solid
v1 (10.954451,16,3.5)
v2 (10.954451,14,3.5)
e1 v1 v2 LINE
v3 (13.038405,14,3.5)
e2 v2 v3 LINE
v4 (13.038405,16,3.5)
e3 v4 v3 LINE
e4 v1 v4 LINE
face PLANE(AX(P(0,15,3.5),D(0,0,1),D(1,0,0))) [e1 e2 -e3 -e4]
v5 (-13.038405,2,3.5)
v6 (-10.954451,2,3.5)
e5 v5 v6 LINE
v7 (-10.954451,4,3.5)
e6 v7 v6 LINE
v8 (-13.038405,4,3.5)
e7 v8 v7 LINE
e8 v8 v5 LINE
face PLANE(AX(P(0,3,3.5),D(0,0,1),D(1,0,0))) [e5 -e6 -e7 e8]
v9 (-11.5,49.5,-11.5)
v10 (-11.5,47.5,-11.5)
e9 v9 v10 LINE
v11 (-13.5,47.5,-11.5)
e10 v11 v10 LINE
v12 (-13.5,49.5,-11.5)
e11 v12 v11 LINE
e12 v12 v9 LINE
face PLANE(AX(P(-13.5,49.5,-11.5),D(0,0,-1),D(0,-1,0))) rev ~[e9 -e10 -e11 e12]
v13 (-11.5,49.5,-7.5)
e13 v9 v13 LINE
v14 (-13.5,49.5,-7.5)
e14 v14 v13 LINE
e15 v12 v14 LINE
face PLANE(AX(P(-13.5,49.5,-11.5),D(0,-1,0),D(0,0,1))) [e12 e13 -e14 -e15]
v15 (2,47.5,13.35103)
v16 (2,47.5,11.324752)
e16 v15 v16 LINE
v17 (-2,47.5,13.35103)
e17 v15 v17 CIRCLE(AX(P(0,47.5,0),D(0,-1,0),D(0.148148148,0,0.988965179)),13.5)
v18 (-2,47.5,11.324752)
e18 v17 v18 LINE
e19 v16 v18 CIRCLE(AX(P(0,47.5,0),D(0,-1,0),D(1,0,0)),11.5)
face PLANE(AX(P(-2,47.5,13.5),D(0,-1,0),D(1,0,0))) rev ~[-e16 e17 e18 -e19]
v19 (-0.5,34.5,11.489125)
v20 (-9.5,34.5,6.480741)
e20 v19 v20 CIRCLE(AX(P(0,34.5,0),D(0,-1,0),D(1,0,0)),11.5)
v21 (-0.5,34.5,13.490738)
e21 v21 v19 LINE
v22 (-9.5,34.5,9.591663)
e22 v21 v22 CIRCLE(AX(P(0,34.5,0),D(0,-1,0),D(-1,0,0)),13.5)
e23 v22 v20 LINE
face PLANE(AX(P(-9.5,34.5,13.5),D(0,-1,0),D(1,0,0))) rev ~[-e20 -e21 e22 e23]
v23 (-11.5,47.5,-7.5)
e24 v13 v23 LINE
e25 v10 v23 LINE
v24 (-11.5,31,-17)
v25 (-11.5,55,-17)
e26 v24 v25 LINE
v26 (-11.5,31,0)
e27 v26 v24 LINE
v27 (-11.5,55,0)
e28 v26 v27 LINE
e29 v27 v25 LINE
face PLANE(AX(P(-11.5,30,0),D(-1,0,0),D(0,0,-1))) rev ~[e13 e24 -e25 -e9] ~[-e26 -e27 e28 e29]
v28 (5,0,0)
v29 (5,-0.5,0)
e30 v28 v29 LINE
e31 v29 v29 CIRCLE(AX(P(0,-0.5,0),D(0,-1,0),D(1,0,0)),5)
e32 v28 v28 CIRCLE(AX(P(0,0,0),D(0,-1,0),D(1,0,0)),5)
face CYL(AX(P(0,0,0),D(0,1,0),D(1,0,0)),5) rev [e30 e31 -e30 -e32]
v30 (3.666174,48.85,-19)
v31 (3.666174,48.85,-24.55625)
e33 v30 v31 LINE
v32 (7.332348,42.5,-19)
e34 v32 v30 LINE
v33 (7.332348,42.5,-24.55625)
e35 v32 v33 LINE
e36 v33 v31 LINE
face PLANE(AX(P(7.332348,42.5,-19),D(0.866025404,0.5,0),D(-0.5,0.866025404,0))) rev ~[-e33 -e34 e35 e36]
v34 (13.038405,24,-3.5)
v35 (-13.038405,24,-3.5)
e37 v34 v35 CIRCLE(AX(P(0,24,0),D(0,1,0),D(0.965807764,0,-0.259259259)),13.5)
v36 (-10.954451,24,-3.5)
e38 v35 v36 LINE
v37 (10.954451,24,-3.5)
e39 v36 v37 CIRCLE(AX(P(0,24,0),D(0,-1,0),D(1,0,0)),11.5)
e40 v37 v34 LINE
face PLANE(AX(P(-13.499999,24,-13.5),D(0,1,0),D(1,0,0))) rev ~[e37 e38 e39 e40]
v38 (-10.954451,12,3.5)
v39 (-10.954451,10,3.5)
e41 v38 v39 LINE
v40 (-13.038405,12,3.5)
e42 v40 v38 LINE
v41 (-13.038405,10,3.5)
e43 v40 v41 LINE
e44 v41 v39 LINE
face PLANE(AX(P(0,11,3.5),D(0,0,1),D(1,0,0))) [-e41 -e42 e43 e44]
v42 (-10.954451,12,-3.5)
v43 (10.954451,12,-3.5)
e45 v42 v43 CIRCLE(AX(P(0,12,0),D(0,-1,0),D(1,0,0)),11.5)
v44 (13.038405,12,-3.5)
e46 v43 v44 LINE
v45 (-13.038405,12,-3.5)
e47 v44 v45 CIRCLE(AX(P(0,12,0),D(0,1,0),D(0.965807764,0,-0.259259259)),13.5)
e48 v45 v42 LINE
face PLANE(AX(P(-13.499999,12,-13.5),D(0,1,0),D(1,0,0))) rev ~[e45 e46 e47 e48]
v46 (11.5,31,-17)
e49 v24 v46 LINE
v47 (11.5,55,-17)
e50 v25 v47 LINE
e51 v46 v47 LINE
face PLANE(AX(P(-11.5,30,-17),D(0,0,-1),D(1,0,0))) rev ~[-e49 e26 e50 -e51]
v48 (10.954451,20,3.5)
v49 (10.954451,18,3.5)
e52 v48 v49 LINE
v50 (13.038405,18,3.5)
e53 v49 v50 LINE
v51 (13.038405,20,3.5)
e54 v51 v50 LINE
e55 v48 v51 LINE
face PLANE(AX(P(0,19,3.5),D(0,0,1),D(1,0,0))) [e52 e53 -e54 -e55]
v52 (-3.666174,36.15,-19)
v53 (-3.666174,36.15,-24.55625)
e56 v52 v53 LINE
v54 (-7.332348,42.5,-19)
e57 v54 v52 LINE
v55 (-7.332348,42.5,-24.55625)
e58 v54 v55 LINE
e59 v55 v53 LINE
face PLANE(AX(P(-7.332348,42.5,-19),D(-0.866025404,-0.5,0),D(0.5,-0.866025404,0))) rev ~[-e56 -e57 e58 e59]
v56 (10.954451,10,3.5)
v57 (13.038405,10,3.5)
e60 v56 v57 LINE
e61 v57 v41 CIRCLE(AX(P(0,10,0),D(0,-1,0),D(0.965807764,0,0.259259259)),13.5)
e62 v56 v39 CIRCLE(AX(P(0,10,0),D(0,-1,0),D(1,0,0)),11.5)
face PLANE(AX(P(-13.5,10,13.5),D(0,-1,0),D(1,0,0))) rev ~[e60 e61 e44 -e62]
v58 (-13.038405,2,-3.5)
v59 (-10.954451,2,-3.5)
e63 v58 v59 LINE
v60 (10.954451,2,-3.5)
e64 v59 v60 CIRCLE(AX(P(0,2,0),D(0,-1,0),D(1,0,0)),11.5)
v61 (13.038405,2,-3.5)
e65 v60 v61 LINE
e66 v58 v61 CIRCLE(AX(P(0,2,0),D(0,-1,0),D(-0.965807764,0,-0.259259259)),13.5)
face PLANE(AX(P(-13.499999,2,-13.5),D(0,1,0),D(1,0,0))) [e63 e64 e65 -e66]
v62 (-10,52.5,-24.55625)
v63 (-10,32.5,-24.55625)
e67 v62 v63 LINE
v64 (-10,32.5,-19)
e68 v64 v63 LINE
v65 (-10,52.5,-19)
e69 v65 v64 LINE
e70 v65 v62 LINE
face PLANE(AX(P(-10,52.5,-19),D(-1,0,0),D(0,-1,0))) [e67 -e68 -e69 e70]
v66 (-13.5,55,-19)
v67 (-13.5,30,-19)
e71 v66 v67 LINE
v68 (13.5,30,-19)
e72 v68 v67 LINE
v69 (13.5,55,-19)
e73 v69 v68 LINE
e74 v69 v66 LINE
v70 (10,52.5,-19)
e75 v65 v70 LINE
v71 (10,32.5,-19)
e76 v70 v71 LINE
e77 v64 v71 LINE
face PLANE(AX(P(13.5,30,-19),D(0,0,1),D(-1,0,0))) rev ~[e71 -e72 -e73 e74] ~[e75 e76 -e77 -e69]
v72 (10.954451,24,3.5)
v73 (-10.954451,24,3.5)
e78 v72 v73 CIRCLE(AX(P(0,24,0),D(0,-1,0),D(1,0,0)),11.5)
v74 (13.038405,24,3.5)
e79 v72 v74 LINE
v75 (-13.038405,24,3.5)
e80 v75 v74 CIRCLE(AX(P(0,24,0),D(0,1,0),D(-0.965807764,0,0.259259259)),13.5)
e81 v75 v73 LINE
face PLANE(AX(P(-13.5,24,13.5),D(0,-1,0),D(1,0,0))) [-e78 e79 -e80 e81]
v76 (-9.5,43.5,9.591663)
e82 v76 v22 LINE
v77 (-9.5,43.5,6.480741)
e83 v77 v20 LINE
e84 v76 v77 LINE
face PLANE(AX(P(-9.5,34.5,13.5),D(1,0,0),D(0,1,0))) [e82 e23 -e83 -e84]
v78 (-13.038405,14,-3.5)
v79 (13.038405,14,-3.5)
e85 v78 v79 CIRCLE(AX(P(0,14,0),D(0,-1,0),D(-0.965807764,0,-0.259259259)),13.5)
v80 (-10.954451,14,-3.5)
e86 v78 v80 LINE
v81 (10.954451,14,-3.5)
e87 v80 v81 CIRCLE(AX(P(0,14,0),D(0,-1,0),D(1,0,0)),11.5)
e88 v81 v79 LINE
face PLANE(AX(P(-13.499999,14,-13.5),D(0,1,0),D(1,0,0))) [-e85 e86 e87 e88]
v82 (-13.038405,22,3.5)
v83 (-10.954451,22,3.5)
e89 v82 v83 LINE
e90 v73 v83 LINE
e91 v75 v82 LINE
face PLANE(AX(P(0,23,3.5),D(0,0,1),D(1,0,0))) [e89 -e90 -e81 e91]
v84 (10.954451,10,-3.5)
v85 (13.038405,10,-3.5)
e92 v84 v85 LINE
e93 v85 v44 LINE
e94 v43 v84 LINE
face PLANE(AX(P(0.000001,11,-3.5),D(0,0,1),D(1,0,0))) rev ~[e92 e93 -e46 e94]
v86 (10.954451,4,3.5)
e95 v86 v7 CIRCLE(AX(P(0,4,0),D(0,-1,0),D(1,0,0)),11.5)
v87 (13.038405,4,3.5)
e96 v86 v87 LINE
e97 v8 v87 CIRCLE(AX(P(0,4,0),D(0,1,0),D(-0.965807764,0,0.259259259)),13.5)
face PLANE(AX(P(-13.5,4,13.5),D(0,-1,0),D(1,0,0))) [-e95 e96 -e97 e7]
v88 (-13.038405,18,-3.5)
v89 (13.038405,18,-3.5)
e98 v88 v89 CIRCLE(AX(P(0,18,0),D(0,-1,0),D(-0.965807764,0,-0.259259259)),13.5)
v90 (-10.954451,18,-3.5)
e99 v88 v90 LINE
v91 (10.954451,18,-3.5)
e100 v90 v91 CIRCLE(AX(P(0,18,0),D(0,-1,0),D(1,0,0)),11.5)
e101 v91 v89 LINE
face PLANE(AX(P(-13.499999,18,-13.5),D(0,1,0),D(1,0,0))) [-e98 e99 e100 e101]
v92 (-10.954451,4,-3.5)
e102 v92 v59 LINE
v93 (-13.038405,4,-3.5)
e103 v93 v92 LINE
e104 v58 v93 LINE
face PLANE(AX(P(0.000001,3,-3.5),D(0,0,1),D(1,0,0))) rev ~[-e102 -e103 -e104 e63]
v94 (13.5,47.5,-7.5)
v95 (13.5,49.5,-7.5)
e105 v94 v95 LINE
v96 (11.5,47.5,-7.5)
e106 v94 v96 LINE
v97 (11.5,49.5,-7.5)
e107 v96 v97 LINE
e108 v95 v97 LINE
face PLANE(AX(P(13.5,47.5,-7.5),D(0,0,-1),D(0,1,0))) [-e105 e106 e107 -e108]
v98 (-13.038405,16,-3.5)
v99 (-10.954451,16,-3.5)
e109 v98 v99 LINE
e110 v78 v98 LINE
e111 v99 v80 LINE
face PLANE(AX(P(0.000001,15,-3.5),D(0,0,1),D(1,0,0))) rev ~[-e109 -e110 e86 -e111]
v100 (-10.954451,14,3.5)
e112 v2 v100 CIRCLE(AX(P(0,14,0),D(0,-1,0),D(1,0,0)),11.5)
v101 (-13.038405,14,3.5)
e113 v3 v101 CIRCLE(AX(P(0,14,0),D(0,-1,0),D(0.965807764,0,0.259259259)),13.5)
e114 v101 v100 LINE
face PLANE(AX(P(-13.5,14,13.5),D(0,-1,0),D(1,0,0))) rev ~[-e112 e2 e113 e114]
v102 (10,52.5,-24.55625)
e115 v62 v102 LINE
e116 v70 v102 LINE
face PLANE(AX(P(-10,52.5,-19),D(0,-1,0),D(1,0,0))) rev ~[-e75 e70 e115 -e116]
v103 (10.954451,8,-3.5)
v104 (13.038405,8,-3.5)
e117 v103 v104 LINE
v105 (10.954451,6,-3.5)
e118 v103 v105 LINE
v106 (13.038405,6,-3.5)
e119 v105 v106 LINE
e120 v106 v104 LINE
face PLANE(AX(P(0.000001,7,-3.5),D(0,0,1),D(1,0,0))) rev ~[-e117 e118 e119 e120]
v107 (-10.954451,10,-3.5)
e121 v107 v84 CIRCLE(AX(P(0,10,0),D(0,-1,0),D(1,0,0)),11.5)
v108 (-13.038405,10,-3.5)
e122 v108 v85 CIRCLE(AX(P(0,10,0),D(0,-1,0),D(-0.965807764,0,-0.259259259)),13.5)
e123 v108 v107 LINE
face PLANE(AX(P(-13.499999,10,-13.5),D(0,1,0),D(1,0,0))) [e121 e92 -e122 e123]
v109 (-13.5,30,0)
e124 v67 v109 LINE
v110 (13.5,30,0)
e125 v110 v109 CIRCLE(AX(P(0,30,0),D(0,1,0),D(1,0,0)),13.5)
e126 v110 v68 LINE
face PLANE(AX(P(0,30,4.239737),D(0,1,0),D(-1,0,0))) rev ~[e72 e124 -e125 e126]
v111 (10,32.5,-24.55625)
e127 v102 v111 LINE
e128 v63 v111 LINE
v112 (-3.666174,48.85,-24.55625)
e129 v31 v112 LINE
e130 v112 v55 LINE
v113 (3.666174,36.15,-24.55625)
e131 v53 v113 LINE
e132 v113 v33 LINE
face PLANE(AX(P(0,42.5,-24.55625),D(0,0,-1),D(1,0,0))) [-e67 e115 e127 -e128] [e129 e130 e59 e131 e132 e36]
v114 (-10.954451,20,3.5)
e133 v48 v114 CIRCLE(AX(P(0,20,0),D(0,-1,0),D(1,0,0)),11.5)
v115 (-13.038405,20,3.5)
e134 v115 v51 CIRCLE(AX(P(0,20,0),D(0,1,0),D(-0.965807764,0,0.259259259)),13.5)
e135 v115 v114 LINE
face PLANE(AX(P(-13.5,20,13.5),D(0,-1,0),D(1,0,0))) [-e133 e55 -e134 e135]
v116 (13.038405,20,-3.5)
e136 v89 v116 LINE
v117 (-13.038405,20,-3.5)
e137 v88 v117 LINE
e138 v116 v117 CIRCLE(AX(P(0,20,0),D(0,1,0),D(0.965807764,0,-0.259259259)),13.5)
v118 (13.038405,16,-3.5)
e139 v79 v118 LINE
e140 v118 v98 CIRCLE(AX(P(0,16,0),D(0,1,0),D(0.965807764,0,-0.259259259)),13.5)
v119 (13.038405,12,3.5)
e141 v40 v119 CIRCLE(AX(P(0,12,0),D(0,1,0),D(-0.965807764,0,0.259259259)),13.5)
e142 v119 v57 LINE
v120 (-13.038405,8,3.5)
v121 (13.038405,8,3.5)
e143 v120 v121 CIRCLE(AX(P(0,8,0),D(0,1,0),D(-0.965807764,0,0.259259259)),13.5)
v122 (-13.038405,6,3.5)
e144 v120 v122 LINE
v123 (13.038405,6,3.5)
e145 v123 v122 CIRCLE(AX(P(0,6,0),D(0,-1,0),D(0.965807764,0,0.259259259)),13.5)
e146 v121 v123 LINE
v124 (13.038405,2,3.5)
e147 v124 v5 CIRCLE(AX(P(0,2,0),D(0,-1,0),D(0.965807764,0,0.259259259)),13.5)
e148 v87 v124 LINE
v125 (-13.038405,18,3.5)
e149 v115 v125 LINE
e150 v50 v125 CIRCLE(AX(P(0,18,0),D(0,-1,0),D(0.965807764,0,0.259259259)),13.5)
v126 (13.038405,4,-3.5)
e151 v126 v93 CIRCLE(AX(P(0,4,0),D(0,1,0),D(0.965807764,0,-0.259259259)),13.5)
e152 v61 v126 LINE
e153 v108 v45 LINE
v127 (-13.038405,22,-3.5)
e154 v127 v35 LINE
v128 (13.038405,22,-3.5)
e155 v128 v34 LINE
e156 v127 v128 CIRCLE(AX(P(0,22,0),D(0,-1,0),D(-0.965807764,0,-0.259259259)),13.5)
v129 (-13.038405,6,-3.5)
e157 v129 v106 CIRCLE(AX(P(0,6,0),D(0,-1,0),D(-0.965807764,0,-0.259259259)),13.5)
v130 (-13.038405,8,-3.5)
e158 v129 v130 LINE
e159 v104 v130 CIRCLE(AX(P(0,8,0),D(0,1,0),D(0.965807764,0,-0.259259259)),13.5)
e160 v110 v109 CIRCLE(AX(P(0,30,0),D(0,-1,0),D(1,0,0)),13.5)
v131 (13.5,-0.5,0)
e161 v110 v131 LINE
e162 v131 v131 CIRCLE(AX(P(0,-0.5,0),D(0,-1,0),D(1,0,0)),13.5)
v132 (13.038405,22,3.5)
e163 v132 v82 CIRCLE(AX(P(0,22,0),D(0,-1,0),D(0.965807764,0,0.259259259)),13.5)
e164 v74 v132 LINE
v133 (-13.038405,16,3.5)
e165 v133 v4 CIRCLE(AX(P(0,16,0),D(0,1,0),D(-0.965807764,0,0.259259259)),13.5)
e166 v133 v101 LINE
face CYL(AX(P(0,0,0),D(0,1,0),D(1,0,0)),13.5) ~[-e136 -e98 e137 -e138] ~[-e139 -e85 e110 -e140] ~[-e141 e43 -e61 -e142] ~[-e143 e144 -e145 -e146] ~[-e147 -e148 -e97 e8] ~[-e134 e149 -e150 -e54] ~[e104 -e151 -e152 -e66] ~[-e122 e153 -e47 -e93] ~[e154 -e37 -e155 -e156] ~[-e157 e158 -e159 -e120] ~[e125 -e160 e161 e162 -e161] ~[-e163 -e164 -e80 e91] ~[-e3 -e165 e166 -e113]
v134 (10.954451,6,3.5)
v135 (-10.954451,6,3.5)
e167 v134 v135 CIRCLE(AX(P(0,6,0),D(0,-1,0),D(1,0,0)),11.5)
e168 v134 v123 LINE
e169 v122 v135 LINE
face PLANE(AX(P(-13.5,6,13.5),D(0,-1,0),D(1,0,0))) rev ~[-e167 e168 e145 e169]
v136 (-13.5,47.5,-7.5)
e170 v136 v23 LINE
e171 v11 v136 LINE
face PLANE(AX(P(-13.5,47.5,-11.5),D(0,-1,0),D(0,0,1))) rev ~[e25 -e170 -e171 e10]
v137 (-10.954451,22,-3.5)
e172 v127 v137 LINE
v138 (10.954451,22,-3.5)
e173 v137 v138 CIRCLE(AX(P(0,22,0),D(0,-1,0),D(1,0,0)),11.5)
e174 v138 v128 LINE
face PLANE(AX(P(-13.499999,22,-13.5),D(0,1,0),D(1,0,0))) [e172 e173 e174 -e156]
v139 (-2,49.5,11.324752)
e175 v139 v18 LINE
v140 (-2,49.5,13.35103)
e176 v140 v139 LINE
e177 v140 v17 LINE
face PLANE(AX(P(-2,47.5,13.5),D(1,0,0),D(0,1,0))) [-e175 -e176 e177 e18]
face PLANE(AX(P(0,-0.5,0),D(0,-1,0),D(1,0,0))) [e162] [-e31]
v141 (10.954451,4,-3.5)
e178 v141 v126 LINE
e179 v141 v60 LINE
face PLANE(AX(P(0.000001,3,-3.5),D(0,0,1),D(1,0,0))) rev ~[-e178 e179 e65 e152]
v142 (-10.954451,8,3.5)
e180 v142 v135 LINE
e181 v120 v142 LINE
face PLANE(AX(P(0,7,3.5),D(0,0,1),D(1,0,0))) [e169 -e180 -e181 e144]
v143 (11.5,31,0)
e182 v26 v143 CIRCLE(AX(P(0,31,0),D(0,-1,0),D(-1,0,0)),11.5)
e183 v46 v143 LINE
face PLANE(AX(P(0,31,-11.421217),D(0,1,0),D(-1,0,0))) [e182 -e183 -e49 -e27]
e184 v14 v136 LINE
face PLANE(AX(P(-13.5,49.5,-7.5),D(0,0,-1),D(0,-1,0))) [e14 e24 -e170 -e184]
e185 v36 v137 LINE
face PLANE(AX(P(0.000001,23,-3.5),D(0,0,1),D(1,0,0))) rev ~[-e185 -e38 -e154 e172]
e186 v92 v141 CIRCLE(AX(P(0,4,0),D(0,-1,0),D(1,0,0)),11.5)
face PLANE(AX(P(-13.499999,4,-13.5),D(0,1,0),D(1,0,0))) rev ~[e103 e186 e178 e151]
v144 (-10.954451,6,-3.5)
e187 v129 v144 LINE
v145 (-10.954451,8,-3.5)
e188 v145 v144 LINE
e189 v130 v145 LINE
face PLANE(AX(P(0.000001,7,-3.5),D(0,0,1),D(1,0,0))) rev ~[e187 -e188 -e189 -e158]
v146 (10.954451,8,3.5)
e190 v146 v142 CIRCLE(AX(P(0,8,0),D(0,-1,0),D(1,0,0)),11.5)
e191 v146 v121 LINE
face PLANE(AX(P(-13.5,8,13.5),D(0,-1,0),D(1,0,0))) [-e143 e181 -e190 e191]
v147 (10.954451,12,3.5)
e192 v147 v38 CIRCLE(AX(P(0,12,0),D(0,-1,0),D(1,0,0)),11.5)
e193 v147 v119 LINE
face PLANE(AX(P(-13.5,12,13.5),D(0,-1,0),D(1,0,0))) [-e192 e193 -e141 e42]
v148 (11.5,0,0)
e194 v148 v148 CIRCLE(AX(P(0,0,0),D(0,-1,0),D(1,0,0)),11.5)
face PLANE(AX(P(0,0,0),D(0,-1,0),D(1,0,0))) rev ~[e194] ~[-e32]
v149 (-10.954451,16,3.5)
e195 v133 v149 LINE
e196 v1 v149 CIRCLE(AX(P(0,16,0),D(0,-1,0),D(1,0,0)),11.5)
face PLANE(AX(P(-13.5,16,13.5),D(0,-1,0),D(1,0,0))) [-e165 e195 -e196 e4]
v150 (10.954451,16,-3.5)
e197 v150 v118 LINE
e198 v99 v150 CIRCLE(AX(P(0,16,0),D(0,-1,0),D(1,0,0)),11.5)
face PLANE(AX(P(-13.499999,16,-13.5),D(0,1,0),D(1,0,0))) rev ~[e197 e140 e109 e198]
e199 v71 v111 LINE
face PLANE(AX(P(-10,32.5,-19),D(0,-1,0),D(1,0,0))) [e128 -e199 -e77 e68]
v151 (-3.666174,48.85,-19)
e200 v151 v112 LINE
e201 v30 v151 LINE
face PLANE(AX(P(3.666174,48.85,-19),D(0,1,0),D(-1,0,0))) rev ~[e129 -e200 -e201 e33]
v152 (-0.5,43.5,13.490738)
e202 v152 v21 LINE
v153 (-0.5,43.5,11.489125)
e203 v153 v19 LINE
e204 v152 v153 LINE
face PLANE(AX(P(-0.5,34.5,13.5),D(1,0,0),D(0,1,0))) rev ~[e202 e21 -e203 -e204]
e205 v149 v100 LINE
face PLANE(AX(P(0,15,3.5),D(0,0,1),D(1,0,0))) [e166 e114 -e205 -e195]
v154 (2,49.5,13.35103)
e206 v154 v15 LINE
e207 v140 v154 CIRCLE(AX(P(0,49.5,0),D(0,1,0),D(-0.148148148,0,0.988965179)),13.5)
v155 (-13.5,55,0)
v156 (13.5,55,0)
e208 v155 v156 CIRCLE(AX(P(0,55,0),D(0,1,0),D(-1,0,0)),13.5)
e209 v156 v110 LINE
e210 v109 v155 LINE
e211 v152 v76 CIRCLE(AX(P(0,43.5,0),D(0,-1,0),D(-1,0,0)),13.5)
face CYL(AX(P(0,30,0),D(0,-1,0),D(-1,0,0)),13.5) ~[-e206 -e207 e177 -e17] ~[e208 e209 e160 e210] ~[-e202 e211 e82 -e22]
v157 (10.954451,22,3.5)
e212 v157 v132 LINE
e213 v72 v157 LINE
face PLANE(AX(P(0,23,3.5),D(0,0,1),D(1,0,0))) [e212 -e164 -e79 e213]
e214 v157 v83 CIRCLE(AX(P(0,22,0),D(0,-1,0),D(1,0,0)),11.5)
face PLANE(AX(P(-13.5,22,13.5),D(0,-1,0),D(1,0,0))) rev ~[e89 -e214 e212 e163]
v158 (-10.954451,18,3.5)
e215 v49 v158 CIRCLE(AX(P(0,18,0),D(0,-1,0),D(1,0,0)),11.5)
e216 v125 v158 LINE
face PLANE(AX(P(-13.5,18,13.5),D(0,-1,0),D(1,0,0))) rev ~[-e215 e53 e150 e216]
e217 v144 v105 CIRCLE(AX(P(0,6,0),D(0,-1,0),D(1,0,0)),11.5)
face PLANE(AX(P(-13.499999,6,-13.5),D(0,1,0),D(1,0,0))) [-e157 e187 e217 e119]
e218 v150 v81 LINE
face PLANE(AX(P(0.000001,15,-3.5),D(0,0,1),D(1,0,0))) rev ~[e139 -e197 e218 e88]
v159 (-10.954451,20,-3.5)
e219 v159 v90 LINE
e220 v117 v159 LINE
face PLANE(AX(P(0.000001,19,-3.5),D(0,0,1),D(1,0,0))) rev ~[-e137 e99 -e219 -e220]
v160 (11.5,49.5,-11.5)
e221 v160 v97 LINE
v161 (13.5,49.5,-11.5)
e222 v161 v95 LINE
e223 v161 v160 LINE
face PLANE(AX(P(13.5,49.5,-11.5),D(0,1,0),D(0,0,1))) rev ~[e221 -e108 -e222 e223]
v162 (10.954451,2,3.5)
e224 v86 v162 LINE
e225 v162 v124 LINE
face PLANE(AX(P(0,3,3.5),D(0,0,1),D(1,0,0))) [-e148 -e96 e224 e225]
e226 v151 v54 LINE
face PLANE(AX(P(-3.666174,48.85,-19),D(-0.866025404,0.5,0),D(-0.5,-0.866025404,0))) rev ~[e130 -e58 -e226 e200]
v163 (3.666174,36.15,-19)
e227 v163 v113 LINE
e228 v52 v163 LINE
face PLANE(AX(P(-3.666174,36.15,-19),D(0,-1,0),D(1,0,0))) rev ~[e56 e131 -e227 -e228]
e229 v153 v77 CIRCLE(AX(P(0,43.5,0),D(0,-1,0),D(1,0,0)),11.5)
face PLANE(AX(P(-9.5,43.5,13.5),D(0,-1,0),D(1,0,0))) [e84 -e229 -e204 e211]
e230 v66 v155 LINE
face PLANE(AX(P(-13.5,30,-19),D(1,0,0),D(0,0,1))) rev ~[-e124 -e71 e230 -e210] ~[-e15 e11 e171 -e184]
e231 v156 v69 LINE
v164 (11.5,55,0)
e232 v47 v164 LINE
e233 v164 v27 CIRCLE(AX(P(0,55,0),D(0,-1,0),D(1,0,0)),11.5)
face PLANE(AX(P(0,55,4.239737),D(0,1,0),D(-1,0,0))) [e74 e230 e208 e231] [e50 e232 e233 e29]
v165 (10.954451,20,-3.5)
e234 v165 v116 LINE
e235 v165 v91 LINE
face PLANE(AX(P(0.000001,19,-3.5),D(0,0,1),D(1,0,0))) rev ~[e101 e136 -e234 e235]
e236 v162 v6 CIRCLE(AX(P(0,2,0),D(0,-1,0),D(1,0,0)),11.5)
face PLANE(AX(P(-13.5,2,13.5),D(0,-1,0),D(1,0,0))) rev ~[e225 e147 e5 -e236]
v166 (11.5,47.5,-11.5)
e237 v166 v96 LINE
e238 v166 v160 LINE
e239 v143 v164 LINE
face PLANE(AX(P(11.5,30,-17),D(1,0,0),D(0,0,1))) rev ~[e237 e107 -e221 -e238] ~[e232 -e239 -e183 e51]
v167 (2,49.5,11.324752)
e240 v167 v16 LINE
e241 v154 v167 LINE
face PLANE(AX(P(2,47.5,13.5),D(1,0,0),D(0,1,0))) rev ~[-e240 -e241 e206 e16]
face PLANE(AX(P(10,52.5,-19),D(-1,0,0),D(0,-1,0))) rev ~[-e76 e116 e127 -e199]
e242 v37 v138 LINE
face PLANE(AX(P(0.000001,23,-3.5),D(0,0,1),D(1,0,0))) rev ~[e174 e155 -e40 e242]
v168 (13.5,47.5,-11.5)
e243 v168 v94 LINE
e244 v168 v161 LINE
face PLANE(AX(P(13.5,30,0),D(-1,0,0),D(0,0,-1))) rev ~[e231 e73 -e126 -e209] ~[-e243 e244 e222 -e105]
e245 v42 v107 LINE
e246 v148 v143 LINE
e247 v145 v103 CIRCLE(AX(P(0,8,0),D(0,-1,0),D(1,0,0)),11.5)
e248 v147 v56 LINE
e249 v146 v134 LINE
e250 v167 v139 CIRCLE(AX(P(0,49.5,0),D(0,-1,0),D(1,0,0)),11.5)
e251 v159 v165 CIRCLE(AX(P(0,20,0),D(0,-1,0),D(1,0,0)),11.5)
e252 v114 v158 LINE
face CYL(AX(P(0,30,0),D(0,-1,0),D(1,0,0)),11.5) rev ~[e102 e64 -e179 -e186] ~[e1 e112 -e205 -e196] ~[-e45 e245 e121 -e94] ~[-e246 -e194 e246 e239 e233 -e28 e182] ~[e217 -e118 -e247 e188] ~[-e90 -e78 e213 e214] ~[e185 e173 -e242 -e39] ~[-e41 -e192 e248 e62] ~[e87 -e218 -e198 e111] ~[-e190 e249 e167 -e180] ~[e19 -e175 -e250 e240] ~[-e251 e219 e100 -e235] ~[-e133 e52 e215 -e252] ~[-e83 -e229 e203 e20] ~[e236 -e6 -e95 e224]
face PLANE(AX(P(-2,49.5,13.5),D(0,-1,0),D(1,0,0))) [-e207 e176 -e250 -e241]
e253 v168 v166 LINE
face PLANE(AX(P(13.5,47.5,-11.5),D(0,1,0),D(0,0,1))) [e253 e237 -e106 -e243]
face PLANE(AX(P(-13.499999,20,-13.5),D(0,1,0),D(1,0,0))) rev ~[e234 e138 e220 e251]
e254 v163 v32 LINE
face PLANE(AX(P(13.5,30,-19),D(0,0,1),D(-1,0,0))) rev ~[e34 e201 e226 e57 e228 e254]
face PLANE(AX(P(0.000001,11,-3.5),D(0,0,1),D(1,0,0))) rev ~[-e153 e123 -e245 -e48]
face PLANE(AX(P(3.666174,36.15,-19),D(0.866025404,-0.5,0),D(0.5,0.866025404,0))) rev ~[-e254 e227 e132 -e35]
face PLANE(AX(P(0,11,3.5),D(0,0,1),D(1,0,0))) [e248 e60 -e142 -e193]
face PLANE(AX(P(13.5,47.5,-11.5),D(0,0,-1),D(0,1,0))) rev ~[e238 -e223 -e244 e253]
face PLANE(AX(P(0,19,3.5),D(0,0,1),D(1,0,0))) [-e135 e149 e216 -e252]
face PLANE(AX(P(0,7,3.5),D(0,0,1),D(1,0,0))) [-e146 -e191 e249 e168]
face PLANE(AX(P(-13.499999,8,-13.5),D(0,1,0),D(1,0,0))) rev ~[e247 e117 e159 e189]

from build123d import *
from build123d import SkipClean  # not in build123d's __all__

# Parameters (mm, degrees)
F0_R      = 13.5
F0_R_2    = 11.5
F1_DEPTH  = 30
F2_R      = 13.5
F2_R_2    = 5
F3_DEPTH  = 0.5
F5_W      = 27
F5_H      = 2
F6_DEPTH  = 10
F8_W      = 27
F8_H      = 2
F9_DEPTH  = 10
F11_DEPTH = 25
F13_DEPTH = 1
F14_W     = 20
F14_H     = 20
F15_DEPTH = 5.55625
F16_W     = 4
F16_H     = 2
F17_DEPTH = 3
F18_W     = 2
F18_H     = 4
F19_DEPTH = 2
F20_W     = 2
F20_H     = 4
F21_DEPTH = 2
F22_W     = 9
F22_H     = 9
F23_DEPTH = 8


# Not quite as in the source:
# - after a boolean that leaves OpenCascade's solid faulty, fix() repairs it
# - a length typed as a fraction of an inch, garbled in the dataset ("3 / 203.2 mm" for 3/8 in), is restored


with BuildPart() as f1:
    # F0 (on Front) → F1 (new body)
    with BuildSketch(Plane.XZ):
        Circle(F0_R)
        Circle(F0_R_2, mode=Mode.SUBTRACT)
    extrude(amount=-F1_DEPTH)

    # F2 (on Front) → F3 (join)
    with BuildSketch(Plane.XZ):
        Circle(F2_R)
        Circle(F2_R_2, mode=Mode.SUBTRACT)
    extrude(amount=F3_DEPTH)

    # F5 (on offset) → F6 (cut)
    with BuildSketch(Plane.XY.offset(13.5)):
        with Locations((0, 2.9999998671)):
            Rectangle(F5_W, F5_H)
        with Locations((0, 22.9999998671)):
            Rectangle(F5_W, F5_H)
        with Locations((0, 6.9999998671)):
            Rectangle(F5_W, F5_H)
        with Locations((0, 10.9999998671)):
            Rectangle(F5_W, F5_H)
        with Locations((0, 14.9999998671)):
            Rectangle(F5_W, F5_H)
        with Locations((0, 18.9999998671)):
            Rectangle(F5_W, F5_H)
    extrude(amount=-F6_DEPTH, mode=Mode.SUBTRACT)

    # F8 (on offset) → F9 (cut)
    with BuildSketch(Plane.XY.offset(-13.5)):
        with Locations((5.811e-07, 3.000000095)):
            Rectangle(F8_W, F8_H)
        with Locations((5.811e-07, 7.000000095)):
            Rectangle(F8_W, F8_H)
        with Locations((5.811e-07, 11.000000095)):
            Rectangle(F8_W, F8_H)
        with Locations((5.811e-07, 15.000000095)):
            Rectangle(F8_W, F8_H)
        with Locations((5.811e-07, 19.000000095)):
            Rectangle(F8_W, F8_H)
        with Locations((5.811e-07, 23.000000095)):
            Rectangle(F8_W, F8_H)
    extrude(amount=F9_DEPTH, mode=Mode.SUBTRACT)

    # F10 (on face) → F11 (join)
    with BuildSketch(Plane(origin=(0, 30, 0), x_dir=(-1, 0, 0), z_dir=(0, 1, 0))):
        with BuildLine():
            Line((11.5, 0), (11.5, -7.0710678119))
            ThreePointArc((11.5, -7.0710678119), (12.9903810568, -3.6742346142), (13.5, 0))
            ThreePointArc((13.5, 0), (0, 13.5), (-13.5, 0))
            ThreePointArc((-13.5, 0), (-12.9903810568, -3.6742346142), (-11.5, -7.0710678119))
            Line((-11.5, -7.0710678119), (-11.5, 0))
            ThreePointArc((-11.5, 0), (0, 11.5), (11.5, 0))
        make_face()
        with BuildLine():
            ThreePointArc((13.5, 0), (12.9903810568, -3.6742346142), (11.5, -7.0710678119))
            Line((11.5, -7.0710678119), (11.5, -17))
            Line((11.5, -17), (-11.5, -17))
            Line((-11.5, -17), (-11.5, -7.0710678119))
            ThreePointArc((-11.5, -7.0710678119), (-12.9903810568, -3.6742346142), (-13.5, 0))
            Line((-13.5, 0), (-13.5, -19))
            Line((-13.5, -19), (13.5, -19))
            Line((13.5, -19), (13.5, 0))
        make_face()
    with SkipClean():  # cleaning this boolean's faces spoils the solid; the shape is the same uncleaned
        extrude(amount=F11_DEPTH)

    # F12 (on face) → F13 (join)
    with BuildSketch(Plane(origin=(0, 30, 0), x_dir=(-1, 0, 0), z_dir=(0, 1, 0))):
        with BuildLine():
            Line((13.5, -19), (13.5, 0))
            ThreePointArc((13.5, 0), (12.9903810568, -3.6742346142), (11.5, -7.0710678119))
            ThreePointArc((11.5, -7.0710678119), (0, -13.5), (-11.5, -7.0710678119))
            ThreePointArc((-11.5, -7.0710678119), (-12.9903810568, -3.6742346142), (-13.5, 0))
            Line((-13.5, 0), (-13.5, -19))
            Line((-13.5, -19), (13.5, -19))
        make_face()
        with BuildLine():
            ThreePointArc((-11.5, -7.0710678119), (0, -13.5), (11.5, -7.0710678119))
            Line((11.5, -7.0710678119), (11.5, 0))
            ThreePointArc((11.5, 0), (0, -11.5), (-11.5, 0))
            Line((-11.5, 0), (-11.5, -7.0710678119))
        make_face()
    with SkipClean():  # cleaning this boolean's faces spoils the solid; the shape is the same uncleaned
        extrude(amount=F13_DEPTH)

    # F14 (on face) → F15 (join)
    with BuildSketch(Plane(origin=(0, 0, -19), x_dir=(1, 0, 0), z_dir=(0, 0, -1))):
        with Locations((0, -42.5)):
            Rectangle(F14_W, F14_H)
        Polygon((-3.6661742094, -36.15), (3.6661742094, -36.15), (7.3323484187, -42.5), (3.6661742094, -48.85), (-3.6661742094, -48.85), (-7.3323484187, -42.5), align=None, mode=Mode.SUBTRACT)
    extrude(amount=F15_DEPTH)

    add(f1.part.fix(), mode=Mode.REPLACE)

    # F16 (on offset) → F17 (cut)
    with BuildSketch(Plane.XY.offset(13.5)):
        with Locations((0, 48.5)):
            Rectangle(F16_W, F16_H)
    extrude(amount=-F17_DEPTH, mode=Mode.SUBTRACT)

    # F18 (on face) → F19 (cut)
    with BuildSketch(Plane.YZ.offset(13.5)):
        with Locations((48.5, -9.5)):
            Rectangle(F18_W, F18_H)
    extrude(amount=-F19_DEPTH, mode=Mode.SUBTRACT)

    # F20 (on face) → F21 (cut)
    with BuildSketch(Plane(origin=(-13.5, 0, 0), x_dir=(0, -1, 0), z_dir=(-1, 0, 0))):
        with Locations((-48.5, -9.5)):
            Rectangle(F20_W, F20_H)
    extrude(amount=-F21_DEPTH, mode=Mode.SUBTRACT)

    # F22 (on offset) → F23 (cut)
    with BuildSketch(Plane.XY.offset(13.5)):
        with Locations((-5, 39)):
            Rectangle(F22_W, F22_H)
    extrude(amount=-F23_DEPTH, mode=Mode.SUBTRACT)


solid = f1.part
